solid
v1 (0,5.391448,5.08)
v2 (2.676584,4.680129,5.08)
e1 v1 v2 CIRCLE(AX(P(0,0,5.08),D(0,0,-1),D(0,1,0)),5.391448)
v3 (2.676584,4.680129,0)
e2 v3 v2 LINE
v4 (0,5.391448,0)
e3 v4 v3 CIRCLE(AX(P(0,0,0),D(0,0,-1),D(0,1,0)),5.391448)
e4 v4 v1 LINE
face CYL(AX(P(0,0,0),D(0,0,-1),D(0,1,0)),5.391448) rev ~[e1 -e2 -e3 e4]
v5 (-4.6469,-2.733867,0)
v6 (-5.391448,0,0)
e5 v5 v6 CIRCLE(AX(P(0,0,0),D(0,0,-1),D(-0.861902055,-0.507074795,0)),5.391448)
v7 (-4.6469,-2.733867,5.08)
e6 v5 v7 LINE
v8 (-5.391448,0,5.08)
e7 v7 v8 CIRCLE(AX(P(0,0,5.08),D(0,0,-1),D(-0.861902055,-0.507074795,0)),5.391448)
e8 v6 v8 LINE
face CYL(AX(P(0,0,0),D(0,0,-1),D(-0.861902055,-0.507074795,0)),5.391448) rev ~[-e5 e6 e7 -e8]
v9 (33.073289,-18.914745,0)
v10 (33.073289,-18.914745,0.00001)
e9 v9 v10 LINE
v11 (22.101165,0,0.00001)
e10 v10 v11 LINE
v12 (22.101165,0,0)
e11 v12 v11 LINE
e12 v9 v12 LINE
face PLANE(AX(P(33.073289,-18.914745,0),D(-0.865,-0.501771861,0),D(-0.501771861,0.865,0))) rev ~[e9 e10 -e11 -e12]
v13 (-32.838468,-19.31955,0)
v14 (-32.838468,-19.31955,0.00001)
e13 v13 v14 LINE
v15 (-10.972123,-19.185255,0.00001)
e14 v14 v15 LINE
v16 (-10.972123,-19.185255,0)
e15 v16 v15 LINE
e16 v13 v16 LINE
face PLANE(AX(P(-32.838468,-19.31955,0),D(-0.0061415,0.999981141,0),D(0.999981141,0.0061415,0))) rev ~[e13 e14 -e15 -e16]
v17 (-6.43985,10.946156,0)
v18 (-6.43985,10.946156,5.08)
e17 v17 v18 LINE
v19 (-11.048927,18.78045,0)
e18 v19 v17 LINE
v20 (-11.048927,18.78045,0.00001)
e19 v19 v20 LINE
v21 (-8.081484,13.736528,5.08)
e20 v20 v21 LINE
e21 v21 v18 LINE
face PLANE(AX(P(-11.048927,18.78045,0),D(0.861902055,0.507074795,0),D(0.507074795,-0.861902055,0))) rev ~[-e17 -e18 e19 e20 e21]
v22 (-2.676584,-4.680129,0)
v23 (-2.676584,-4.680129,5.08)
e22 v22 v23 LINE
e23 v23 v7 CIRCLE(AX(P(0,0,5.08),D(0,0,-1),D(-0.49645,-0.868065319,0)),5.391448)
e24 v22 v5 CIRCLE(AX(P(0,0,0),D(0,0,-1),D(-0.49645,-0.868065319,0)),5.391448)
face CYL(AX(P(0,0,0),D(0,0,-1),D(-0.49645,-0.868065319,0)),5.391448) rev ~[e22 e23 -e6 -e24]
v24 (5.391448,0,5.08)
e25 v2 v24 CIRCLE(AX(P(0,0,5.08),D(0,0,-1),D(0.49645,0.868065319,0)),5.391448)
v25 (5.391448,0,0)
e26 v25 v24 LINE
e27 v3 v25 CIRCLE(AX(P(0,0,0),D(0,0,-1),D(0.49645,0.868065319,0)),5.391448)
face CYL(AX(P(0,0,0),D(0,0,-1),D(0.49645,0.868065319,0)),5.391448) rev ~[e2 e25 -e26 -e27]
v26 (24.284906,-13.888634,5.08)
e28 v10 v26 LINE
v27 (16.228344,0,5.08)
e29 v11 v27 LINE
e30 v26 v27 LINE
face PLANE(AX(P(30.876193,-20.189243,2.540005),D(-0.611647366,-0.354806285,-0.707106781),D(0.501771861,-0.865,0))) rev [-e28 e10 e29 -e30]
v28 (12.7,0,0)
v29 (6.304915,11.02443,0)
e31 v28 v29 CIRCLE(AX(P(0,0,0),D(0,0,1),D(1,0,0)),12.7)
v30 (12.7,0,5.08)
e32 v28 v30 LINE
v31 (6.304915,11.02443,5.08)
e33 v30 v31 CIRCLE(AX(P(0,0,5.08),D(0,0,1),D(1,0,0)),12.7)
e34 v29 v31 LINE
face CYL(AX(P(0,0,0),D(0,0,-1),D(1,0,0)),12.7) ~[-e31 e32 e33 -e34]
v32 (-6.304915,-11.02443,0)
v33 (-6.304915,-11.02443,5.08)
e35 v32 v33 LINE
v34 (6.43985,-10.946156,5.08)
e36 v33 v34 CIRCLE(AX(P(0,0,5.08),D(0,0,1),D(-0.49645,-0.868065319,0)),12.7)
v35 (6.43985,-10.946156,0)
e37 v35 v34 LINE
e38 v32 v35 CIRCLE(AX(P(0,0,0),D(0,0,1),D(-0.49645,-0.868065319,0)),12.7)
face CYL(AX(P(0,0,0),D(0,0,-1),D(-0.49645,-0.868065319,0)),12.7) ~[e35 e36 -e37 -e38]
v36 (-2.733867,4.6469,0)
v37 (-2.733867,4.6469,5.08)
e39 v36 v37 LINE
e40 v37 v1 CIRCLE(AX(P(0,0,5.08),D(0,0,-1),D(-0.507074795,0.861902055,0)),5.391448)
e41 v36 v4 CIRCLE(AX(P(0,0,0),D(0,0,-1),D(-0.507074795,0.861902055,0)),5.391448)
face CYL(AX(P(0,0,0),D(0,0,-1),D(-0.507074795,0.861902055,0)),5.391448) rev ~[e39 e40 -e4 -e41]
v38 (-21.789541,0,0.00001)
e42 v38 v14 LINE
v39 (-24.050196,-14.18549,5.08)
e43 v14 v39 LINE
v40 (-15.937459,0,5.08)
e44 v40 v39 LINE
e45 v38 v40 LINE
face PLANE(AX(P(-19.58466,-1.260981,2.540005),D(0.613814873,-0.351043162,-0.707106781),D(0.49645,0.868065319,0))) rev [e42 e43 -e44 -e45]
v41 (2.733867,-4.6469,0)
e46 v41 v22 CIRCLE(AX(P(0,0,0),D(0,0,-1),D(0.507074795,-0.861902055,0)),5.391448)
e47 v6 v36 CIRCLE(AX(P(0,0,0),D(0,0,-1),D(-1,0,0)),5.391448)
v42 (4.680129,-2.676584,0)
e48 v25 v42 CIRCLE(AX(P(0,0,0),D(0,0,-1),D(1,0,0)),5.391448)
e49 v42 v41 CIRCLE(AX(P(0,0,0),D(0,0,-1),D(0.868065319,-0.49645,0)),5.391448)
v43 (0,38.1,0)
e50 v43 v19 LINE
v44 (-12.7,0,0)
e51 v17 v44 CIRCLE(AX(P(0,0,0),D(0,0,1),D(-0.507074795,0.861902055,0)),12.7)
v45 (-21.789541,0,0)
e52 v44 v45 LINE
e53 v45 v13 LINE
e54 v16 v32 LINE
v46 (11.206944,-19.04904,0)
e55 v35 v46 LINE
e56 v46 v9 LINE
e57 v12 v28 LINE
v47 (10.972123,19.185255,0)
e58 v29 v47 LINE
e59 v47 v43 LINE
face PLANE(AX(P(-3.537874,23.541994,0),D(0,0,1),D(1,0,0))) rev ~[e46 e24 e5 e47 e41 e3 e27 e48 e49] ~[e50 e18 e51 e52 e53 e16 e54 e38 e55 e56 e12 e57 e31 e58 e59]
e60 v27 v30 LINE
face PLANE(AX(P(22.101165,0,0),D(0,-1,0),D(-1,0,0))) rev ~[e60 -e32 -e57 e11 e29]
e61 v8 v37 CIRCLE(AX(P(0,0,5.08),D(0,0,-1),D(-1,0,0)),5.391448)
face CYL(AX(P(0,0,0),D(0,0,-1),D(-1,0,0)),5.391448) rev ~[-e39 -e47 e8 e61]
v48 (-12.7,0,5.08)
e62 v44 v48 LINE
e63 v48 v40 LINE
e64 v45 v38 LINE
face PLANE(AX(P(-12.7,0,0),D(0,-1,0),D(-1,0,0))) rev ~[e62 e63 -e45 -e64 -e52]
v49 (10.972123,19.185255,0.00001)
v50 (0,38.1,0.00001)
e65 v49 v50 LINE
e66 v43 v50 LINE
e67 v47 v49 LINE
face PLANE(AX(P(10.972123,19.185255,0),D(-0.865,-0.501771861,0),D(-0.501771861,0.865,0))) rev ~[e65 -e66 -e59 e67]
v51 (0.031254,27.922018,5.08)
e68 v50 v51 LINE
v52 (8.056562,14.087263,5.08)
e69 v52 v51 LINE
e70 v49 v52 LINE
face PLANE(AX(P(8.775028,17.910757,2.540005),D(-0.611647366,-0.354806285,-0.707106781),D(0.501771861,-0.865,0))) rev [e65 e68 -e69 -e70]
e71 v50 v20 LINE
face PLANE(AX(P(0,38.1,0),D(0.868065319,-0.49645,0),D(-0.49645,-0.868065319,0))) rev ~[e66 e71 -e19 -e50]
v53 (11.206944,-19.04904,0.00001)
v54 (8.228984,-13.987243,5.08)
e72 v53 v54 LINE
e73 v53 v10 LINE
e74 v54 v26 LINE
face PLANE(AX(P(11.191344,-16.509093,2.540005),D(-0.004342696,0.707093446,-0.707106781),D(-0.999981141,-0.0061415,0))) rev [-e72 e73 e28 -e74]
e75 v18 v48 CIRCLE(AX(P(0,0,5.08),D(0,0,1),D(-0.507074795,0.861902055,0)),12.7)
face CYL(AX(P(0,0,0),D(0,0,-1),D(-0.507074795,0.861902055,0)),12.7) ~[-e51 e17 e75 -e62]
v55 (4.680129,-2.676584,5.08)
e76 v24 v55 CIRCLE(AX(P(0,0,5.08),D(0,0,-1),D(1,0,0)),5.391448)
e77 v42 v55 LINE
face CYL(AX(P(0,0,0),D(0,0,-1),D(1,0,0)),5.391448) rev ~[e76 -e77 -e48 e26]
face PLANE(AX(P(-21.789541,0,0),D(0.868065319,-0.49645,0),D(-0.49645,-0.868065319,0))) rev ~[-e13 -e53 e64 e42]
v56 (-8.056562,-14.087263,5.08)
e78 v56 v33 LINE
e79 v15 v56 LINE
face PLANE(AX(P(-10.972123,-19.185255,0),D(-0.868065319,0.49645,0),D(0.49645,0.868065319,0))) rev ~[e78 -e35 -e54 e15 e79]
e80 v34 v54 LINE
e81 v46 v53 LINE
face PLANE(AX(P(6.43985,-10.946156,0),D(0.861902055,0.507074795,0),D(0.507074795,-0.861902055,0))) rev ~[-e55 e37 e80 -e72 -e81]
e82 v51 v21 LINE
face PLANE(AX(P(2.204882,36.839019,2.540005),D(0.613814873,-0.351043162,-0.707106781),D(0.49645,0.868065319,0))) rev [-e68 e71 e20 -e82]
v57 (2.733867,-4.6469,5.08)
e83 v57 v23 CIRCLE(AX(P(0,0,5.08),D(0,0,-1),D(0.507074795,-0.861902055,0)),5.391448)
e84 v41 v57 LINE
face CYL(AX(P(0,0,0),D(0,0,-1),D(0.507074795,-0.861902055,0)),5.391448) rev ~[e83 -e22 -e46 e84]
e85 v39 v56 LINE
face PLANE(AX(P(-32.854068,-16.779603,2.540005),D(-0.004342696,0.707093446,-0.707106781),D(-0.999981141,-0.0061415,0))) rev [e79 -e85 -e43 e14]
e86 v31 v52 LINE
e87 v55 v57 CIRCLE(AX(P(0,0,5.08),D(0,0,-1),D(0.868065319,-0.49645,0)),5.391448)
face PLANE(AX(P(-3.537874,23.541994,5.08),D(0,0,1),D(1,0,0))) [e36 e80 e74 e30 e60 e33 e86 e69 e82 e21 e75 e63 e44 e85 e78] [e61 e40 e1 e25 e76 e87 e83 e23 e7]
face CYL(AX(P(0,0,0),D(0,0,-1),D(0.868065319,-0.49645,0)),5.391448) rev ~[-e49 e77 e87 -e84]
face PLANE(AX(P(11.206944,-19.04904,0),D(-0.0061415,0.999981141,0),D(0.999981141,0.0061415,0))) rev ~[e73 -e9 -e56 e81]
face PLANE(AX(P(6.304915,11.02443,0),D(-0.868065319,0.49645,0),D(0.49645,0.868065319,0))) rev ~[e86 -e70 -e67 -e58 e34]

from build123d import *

# Parameters (mm, degrees)
F1_DEPTH = 5.08
F2_SIZE  = 5.07999


# Not quite as in the source:
# - a fillet or chamfer is up to 0.001 mm smaller than in the source, because OpenCascade refuses the exact size


with BuildPart() as f1:
    # F0 (on Top) → F1 (new body)
    with BuildSketch(Plane.XY):
        with BuildLine():
            ThreePointArc((-6.4398498965, 10.9461560975), (-3.3372007403, 12.2536970429), (0, 12.7))
            Line((0, 12.7), (0, 38.1))
            Line((0, 38.1), (-11.0489271221, 18.7804503105))
            Line((-11.0489271221, 18.7804503105), (-6.4398498965, 10.9461560975))
        make_face()
        with BuildLine():
            ThreePointArc((0, 12.7), (3.261881723, 12.2739613665), (6.304915, 11.0244295473))
            Line((6.304915, 11.0244295473), (10.9721234563, 19.185255))
            Line((10.9721234563, 19.185255), (0, 38.1))
            Line((0, 38.1), (0, 12.7))
        make_face()
        with BuildLine():
            ThreePointArc((-2.7338674235, 4.6469001683), (-1.4167200379, 5.2019819875), (0, 5.3914480674))
            Line((0, 5.3914480674), (0, 12.7))
            ThreePointArc((0, 12.7), (-3.3372007403, 12.2536970429), (-6.4398498965, 10.9461560975))
            Line((-6.4398498965, 10.9461560975), (-2.7338674235, 4.6469001683))
        make_face()
        with BuildLine():
            ThreePointArc((0, 5.3914480674), (1.3847453474, 5.2105846684), (2.6765843931, 4.6801290848))
            Line((2.6765843931, 4.6801290848), (6.304915, 11.0244295473))
            ThreePointArc((6.304915, 11.0244295473), (3.261881723, 12.2739613665), (0, 12.7))
            Line((0, 12.7), (0, 5.3914480674))
        make_face()
        with BuildLine():
            ThreePointArc((-5.3914480674, 0), (-4.6801290848, 2.6765843931), (-2.7338674235, 4.6469001683))
            Line((-2.7338674235, 4.6469001683), (-6.4398498965, 10.9461560975))
            ThreePointArc((-6.4398498965, 10.9461560975), (-11.0244295473, 6.304915), (-12.7, 0))
            Line((-12.7, 0), (-5.3914480674, 0))
        make_face()
        with BuildLine():
            ThreePointArc((2.6765843931, 4.6801290848), (4.6636025783, 2.7052769276), (5.3914480674, 0))
            Line((5.3914480674, 0), (12.7, 0))
            ThreePointArc((12.7, 0), (10.9855, 6.3725026285), (6.304915, 11.0244295473))
            Line((6.304915, 11.0244295473), (2.6765843931, 4.6801290848))
        make_face()
        with BuildLine():
            Line((-10.9461560975, -6.4398498965), (-4.6469001683, -2.7338674235))
            ThreePointArc((-4.6469001683, -2.7338674235), (-5.2019819875, -1.4167200379), (-5.3914480674, 0))
            Line((-5.3914480674, 0), (-12.7, 0))
            ThreePointArc((-12.7, 0), (-12.2536970429, -3.3372007403), (-10.9461560975, -6.4398498965))
        make_face()
        with BuildLine():
            Line((12.7, 0), (5.3914480674, 0))
            ThreePointArc((5.3914480674, 0), (5.2105846684, -1.3847453474), (4.6801290848, -2.6765843931))
            Line((4.6801290848, -2.6765843931), (11.0244295473, -6.304915))
            ThreePointArc((11.0244295473, -6.304915), (12.2739613665, -3.261881723), (12.7, 0))
        make_face()
        with BuildLine():
            Line((11.0244295473, -6.304915), (4.6801290848, -2.6765843931))
            ThreePointArc((4.6801290848, -2.6765843931), (3.835671013, -3.7888441699), (2.7338674235, -4.6469001683))
            Line((2.7338674235, -4.6469001683), (6.4398498965, -10.9461560975))
            ThreePointArc((6.4398498965, -10.9461560975), (9.0352390037, -8.9249345178), (11.0244295473, -6.304915))
        make_face()
        with BuildLine():
            Line((6.4398498965, -10.9461560975), (2.7338674235, -4.6469001683))
            ThreePointArc((2.7338674235, -4.6469001683), (0.0331115783, -5.3913463891), (-2.6765843931, -4.6801290848))
            Line((-2.6765843931, -4.6801290848), (-6.304915, -11.0244295473))
            ThreePointArc((-6.304915, -11.0244295473), (0.07799705, -12.6997604883), (6.4398498965, -10.9461560975))
        make_face()
        with BuildLine():
            ThreePointArc((-2.6765843931, -4.6801290848), (-3.7888441699, -3.835671013), (-4.6469001683, -2.7338674235))
            Line((-4.6469001683, -2.7338674235), (-10.9461560975, -6.4398498965))
            ThreePointArc((-10.9461560975, -6.4398498965), (-8.9249345178, -9.0352390037), (-6.304915, -11.0244295473))
            Line((-6.304915, -11.0244295473), (-2.6765843931, -4.6801290848))
        make_face()
        with BuildLine():
            Line((-32.8384682925, -19.3195496895), (-10.9461560975, -6.4398498965))
            ThreePointArc((-10.9461560975, -6.4398498965), (-12.2536970429, -3.3372007403), (-12.7, 0))
            Line((-12.7, 0), (-21.7895411704, 0))
            Line((-21.7895411704, 0), (-32.8384682925, -19.3195496895))
        make_face()
        with BuildLine():
            ThreePointArc((-6.304915, -11.0244295473), (-8.9249345178, -9.0352390037), (-10.9461560975, -6.4398498965))
            Line((-10.9461560975, -6.4398498965), (-32.8384682925, -19.3195496895))
            Line((-32.8384682925, -19.3195496895), (-10.9721234563, -19.185255))
            Line((-10.9721234563, -19.185255), (-6.304915, -11.0244295473))
        make_face()
        with BuildLine():
            Line((33.0732886418, -18.914745), (11.0244295473, -6.304915))
            ThreePointArc((11.0244295473, -6.304915), (9.0352390037, -8.9249345178), (6.4398498965, -10.9461560975))
            Line((6.4398498965, -10.9461560975), (11.2069438057, -19.0490396895))
            Line((11.2069438057, -19.0490396895), (33.0732886418, -18.914745))
        make_face()
        with BuildLine():
            Line((22.1011651855, 0), (12.7, 0))
            ThreePointArc((12.7, 0), (12.2739613665, -3.261881723), (11.0244295473, -6.304915))
            Line((11.0244295473, -6.304915), (33.0732886418, -18.914745))
            Line((33.0732886418, -18.914745), (22.1011651855, 0))
        make_face()
    extrude(amount=F1_DEPTH)

    # F2 (size 5.08 in the source; OpenCascade refuses exactly that, so slightly less here)
    f2_edges = [f1.edges().sort_by_distance(p)[0] for p in [
        (-5.524464, 28.440225, 5.08),
        (5.486062, 28.642628, 5.08),
        (-27.314005, -9.659775, 5.08),
        (-21.905296, -19.252402, 5.08),
        (22.140116, -18.981892, 5.08),
        (27.587227, -9.457373, 5.08),
    ]]
    chamfer(f2_edges, length=F2_SIZE)


solid = f1.part
